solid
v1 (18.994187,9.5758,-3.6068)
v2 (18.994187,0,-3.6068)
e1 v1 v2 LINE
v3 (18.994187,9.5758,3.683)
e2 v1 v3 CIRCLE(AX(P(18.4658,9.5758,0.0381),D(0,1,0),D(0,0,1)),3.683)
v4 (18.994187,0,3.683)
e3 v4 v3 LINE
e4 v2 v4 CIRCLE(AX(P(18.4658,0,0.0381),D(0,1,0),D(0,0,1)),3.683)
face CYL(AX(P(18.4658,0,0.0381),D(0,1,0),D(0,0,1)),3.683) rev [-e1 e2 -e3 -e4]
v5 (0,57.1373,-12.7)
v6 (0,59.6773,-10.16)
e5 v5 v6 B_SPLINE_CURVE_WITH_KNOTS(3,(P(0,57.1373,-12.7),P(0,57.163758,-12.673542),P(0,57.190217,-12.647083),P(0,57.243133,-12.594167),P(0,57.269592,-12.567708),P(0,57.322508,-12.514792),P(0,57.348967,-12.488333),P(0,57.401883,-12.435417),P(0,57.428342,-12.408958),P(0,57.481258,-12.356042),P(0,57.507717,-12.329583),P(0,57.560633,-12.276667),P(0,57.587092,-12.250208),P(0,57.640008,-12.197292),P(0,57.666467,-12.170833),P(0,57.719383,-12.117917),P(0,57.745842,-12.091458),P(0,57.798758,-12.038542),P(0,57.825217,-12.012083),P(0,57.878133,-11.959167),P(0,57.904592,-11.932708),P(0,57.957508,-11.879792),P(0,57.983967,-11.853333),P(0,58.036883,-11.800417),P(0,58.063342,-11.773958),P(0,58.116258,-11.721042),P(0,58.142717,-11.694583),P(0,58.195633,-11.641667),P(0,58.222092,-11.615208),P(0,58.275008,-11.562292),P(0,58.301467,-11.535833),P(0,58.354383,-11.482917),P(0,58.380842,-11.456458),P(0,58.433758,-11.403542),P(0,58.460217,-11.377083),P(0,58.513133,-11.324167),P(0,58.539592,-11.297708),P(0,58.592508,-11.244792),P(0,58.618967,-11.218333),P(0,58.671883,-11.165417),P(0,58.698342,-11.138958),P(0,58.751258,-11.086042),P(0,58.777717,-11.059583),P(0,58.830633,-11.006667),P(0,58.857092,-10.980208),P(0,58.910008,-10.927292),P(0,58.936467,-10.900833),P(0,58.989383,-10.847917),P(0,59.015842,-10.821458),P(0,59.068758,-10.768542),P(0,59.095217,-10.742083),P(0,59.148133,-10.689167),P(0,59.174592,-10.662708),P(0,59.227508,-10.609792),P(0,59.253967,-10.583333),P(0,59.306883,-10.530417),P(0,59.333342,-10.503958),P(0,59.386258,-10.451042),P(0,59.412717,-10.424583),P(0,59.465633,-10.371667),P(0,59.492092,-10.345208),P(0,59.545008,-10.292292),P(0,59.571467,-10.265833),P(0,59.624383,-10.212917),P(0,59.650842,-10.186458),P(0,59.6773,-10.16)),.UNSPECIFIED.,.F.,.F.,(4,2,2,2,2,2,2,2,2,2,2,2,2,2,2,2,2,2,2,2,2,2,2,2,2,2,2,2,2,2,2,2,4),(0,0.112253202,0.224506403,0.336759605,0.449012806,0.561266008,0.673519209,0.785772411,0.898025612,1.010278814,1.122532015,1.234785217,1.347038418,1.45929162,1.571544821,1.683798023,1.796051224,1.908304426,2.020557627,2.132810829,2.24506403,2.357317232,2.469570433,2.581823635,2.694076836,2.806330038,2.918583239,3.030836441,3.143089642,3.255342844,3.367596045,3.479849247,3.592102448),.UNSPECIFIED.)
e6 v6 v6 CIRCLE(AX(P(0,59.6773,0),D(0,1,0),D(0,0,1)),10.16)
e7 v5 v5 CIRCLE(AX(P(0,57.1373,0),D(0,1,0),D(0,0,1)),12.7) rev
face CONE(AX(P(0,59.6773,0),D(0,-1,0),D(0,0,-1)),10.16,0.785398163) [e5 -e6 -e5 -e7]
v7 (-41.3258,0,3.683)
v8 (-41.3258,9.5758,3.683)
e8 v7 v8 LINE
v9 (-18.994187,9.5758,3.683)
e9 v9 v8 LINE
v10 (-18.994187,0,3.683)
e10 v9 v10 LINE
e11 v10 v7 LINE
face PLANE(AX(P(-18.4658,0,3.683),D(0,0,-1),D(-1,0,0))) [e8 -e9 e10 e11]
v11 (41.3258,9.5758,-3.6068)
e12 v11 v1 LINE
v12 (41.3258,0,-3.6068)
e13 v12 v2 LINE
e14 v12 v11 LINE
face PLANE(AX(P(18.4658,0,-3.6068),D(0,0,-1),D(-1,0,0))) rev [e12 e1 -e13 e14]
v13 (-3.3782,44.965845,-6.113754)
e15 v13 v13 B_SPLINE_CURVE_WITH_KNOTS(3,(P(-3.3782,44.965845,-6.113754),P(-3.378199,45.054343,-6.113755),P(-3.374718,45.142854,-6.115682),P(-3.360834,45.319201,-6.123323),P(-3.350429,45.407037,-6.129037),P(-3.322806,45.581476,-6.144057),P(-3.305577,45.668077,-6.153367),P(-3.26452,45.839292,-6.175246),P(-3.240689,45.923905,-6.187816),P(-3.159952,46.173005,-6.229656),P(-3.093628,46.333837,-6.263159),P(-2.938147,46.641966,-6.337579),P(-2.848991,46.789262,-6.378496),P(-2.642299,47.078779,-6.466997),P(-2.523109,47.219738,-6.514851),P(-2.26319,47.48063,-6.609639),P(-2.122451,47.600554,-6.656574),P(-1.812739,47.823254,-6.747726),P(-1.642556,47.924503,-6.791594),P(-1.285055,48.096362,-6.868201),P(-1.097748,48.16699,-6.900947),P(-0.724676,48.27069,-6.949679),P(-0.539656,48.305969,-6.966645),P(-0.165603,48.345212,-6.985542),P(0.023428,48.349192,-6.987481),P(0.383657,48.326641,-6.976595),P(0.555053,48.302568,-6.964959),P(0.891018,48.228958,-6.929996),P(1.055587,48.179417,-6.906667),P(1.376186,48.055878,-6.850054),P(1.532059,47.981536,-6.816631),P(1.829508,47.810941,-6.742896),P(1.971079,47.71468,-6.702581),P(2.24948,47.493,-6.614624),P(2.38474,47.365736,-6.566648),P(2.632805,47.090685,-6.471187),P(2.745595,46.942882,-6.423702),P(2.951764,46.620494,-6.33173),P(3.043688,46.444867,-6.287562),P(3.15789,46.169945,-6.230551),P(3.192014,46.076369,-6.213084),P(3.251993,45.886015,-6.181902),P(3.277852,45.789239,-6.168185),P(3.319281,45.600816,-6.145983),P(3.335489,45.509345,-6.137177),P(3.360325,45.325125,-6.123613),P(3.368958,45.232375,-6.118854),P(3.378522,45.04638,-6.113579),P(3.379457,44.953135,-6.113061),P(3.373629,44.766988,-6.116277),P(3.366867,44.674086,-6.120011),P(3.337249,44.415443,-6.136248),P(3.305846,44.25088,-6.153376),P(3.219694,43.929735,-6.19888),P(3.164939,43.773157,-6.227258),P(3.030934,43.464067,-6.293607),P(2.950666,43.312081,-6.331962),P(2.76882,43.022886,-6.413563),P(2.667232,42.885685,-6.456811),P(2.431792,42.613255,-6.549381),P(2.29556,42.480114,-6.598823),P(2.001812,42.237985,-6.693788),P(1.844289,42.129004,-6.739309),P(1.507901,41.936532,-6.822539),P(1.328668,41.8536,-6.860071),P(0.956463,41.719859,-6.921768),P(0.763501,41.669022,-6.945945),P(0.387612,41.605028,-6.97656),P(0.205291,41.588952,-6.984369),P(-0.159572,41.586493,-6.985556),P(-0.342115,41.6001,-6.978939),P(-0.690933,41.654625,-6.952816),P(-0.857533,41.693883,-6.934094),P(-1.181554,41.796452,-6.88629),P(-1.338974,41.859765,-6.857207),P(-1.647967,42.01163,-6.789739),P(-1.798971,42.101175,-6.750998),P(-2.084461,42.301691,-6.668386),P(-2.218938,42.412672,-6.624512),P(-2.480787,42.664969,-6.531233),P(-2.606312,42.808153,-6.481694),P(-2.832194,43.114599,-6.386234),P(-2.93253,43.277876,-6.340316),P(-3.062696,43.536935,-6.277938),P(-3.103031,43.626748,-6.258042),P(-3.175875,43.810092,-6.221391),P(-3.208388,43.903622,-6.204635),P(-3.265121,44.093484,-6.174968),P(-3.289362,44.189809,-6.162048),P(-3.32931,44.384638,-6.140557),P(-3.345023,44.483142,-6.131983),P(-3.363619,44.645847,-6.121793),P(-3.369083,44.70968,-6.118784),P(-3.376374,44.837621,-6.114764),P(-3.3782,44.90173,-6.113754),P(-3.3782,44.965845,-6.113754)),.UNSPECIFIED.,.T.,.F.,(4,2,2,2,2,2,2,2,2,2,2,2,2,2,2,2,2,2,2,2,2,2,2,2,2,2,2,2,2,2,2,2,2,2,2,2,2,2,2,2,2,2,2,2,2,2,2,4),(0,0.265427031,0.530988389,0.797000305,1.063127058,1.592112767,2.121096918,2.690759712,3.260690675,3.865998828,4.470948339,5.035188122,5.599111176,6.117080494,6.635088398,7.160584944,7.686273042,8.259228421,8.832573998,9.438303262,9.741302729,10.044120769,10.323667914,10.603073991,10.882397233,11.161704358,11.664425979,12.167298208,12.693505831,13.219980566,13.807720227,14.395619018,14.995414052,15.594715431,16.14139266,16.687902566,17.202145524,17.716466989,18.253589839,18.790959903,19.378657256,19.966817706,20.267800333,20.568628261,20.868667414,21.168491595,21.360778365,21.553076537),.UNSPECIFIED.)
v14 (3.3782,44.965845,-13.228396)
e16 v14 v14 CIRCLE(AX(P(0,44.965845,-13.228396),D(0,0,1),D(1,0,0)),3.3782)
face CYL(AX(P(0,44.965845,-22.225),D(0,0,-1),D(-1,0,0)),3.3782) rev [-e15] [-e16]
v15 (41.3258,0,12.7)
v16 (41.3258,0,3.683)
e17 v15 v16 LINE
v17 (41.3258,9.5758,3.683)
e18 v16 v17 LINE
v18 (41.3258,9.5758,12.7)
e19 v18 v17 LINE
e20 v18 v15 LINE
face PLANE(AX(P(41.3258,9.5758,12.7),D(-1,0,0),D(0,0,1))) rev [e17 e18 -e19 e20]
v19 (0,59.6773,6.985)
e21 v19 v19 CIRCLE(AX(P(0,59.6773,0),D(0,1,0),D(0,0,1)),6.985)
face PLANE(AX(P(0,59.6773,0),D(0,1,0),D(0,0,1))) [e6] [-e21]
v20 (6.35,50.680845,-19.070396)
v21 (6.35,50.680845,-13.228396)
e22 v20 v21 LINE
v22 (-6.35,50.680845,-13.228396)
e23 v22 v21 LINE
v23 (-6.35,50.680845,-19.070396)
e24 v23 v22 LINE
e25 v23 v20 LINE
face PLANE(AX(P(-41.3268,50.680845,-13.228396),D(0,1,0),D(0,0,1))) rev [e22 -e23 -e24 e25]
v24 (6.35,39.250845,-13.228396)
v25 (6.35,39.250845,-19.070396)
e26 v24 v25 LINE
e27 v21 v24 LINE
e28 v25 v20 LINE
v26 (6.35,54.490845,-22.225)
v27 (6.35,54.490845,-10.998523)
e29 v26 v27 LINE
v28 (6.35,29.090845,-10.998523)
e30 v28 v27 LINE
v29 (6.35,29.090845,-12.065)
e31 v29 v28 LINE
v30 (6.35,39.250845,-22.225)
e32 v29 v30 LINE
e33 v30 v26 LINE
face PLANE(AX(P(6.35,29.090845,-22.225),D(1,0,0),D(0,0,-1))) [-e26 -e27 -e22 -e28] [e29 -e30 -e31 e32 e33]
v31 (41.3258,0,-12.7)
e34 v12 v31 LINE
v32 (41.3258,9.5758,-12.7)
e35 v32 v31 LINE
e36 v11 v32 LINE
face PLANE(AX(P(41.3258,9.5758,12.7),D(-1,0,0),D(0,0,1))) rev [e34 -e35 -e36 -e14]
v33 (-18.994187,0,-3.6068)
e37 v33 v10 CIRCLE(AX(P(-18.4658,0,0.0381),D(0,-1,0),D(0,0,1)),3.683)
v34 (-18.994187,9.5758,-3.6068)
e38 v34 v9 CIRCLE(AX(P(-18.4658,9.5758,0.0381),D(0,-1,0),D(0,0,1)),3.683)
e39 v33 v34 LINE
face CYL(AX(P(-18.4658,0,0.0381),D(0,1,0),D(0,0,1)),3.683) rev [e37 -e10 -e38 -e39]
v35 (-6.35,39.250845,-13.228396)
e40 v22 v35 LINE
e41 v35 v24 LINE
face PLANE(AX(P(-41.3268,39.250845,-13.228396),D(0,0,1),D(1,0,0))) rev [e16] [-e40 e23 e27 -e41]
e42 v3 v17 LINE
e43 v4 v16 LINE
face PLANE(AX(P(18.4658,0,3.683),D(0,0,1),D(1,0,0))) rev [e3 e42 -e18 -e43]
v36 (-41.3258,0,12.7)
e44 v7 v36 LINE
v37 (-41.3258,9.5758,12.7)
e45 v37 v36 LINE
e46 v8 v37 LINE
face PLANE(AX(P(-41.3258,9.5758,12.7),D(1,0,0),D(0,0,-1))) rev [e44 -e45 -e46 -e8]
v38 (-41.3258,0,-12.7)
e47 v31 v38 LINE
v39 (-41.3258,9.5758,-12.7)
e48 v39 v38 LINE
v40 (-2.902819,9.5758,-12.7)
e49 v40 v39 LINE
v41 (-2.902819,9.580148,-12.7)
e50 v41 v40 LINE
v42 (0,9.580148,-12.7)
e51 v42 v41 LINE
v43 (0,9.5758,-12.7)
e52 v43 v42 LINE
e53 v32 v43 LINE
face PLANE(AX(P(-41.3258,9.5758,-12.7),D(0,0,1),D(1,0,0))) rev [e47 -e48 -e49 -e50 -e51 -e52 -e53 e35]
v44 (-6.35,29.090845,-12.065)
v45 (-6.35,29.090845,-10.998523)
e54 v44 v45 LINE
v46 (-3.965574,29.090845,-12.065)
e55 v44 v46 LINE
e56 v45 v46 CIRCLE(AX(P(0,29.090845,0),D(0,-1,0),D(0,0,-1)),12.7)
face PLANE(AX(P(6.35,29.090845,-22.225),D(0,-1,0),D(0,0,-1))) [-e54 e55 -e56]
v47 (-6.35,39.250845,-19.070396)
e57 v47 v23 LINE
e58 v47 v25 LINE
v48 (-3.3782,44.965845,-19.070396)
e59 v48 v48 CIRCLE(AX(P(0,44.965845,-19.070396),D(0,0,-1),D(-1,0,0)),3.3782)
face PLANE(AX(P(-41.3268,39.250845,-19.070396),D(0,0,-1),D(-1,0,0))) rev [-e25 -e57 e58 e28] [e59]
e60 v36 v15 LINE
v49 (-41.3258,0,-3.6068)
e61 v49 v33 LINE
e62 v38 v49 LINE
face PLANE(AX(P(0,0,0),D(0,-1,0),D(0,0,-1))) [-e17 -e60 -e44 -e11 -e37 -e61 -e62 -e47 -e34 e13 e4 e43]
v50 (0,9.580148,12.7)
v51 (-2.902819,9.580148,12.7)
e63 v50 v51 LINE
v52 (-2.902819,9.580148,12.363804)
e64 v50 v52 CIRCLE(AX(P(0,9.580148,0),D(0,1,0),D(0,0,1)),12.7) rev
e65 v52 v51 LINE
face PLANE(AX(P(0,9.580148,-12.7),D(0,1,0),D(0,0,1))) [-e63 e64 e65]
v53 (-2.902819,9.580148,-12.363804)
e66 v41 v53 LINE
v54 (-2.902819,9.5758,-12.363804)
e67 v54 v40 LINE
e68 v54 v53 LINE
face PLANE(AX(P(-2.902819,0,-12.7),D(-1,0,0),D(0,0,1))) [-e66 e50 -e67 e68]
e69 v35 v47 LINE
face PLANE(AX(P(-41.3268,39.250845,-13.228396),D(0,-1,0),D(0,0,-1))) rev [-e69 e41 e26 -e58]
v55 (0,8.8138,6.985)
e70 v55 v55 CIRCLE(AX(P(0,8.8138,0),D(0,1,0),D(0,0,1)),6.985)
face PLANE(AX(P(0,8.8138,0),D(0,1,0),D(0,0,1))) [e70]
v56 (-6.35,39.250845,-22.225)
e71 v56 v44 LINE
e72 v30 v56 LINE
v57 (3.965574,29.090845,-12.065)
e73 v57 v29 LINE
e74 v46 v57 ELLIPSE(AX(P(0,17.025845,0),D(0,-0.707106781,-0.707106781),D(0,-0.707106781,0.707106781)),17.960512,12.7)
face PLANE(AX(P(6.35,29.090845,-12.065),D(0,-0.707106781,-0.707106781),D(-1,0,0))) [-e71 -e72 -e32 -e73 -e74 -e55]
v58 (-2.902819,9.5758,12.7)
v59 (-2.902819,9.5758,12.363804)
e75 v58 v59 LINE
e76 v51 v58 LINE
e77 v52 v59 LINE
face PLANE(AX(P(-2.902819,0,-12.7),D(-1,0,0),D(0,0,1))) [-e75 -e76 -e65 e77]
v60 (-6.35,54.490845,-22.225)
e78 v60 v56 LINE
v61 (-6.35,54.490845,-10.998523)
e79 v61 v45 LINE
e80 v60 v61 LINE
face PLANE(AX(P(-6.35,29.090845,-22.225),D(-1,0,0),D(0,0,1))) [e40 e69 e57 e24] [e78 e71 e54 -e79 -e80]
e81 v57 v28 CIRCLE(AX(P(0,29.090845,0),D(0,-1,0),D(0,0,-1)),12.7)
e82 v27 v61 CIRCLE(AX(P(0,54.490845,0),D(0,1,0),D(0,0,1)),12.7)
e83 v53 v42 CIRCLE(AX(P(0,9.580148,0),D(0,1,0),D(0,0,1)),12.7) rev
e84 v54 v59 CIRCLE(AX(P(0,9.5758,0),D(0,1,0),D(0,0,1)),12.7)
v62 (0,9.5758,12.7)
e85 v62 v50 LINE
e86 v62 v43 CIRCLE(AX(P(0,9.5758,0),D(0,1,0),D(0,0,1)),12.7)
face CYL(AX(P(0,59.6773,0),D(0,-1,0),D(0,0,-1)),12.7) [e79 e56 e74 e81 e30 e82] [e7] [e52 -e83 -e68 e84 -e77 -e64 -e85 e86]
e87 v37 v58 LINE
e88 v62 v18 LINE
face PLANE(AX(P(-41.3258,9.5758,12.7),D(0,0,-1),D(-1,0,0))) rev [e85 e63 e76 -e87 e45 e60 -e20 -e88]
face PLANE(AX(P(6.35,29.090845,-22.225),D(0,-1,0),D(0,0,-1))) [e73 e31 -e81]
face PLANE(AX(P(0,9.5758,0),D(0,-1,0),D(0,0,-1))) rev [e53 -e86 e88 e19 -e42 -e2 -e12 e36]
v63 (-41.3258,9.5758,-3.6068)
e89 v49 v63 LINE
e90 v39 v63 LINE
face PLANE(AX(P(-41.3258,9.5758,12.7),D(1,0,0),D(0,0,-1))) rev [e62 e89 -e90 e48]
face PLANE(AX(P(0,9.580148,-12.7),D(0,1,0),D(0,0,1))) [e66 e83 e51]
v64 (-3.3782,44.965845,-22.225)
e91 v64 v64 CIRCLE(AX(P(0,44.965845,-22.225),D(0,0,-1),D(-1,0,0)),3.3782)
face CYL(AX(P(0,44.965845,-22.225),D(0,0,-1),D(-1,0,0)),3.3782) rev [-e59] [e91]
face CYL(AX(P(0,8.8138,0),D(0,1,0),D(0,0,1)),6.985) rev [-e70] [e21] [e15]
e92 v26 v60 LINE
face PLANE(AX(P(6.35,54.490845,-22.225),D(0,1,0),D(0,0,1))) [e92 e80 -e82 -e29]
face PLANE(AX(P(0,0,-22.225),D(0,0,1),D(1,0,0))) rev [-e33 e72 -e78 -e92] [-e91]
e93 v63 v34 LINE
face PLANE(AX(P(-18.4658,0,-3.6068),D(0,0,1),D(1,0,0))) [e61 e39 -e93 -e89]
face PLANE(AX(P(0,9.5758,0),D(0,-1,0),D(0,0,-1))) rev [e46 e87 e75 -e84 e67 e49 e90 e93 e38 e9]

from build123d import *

# Parameters (mm, degrees)
SKETCH1_W                   = 82.6516
SKETCH1_H                   = 25.4
BOSS_EXTRUDE1_DEPTH         = 9.5758
SKETCH8_W                   = 2.902818519
SKETCH8_H                   = 9.580147983
BOSS_EXTRUDE4_DEPTH         = 25.4
SKETCH10_R                  = 12.7
BOSS_EXTRUDE5_DEPTH         = 50.1015
SKETCH12_R                  = 6.985
CUT_EXTRUDE2_DEPTH          = 50.8635
CHAMFER1_SIZE               = 2.54
SKETCH14_W                  = 12.7
SKETCH14_H                  = 25.4
BOSS_EXTRUDE6_DEPTH         = 15.24
CUT_EXTRUDE3_REACH          = 81.551
SKETCH18_W                  = 5.842
SKETCH18_H                  = 11.43
F_1_4_CLEARANCE_HOLE2_D     = 6.7564
F_1_4_CLEARANCE_HOLE2_DEPTH = 20.32
F_1_4_CLEARANCE_HOLE2_TIP   = 2.029827343
CHAMFER2_SIZE               = 10.16
SKETCH2_W                   = 22.86
SKETCH2_H                   = 7.2898
CUT_EXTRUDE1_DEPTH          = 69.64351887
SKETCH23_R                  = 3.683
CUT_EXTRUDE6_DEPTH          = 69.64351887


with BuildPart() as part:
    # Sketch1 → Boss-Extrude1 (new body)
    with BuildSketch(Plane(origin=(0, 0, 0), x_dir=(1, 0, 0), z_dir=(0, 1, 0))):
        Rectangle(SKETCH1_W, SKETCH1_H)
    extrude(amount=BOSS_EXTRUDE1_DEPTH)

    # Sketch8 → Boss-Extrude4 (add, through all)
    with BuildSketch(Plane.XY.offset(12.7)):
        with Locations((-1.45140926, 4.790073991)):
            Rectangle(SKETCH8_W, SKETCH8_H)
    extrude(amount=-BOSS_EXTRUDE4_DEPTH)

    # Sketch10 → Boss-Extrude5 (add)
    with BuildSketch(Plane(origin=(0, 9.5758, 0), x_dir=(1, 0, 0), z_dir=(0, 1, 0))):
        with Locations(Location((0, 0, 0), (0, 0, 270))):
            Circle(SKETCH10_R)
    extrude(amount=BOSS_EXTRUDE5_DEPTH)

    # Sketch12 → Cut-Extrude2 (cut)
    with BuildSketch(Plane(origin=(0, 59.6773, 0), x_dir=(1, 0, 0), z_dir=(0, 1, 0))):
        with Locations(Location((0, 0, 0), (0, 0, 270))):
            Circle(SKETCH12_R)
    extrude(amount=-CUT_EXTRUDE2_DEPTH, mode=Mode.SUBTRACT)

    # Chamfer1
    chamfer1_edges = [part.edges().sort_by_distance(p)[0] for p in [
        (0, 59.6773, -12.7),
    ]]
    chamfer(chamfer1_edges, length=CHAMFER1_SIZE)

    # Sketch14 → Boss-Extrude6 (add)
    with BuildSketch(Plane.XY.offset(-6.985)):
        with Locations((0, 41.790845474)):
            Rectangle(SKETCH14_W, SKETCH14_H)
    extrude(amount=-BOSS_EXTRUDE6_DEPTH)

    # Sketch18 → Cut-Extrude3 (cut, up to next)
    with BuildSketch(Plane(origin=(6.35, 0, 0), x_dir=(0, 0, -1), z_dir=(1, 0, 0)), mode=Mode.PRIVATE) as cut_extrude3_sk1:
        with Locations((16.149395763, 44.965845474)):
            Rectangle(SKETCH18_W, SKETCH18_H)
    cut_extrude3_tool1 = extrude(cut_extrude3_sk1.sketch, amount=-CUT_EXTRUDE3_REACH, mode=Mode.PRIVATE) & part.part
    add(cut_extrude3_tool1.solids().sort_by_distance((6.35, 44.965845, -16.149396))[0], mode=Mode.SUBTRACT)

    # 1/4 Clearance Hole2
    with Locations(Plane(origin=(0, 0, -22.225), x_dir=(-1, 0, 0), z_dir=(0, 0, -1))):
        with Locations((0, 44.965845474)):
            Hole(F_1_4_CLEARANCE_HOLE2_D / 2, depth=F_1_4_CLEARANCE_HOLE2_DEPTH)
            with Locations((0, 0, -(F_1_4_CLEARANCE_HOLE2_DEPTH + F_1_4_CLEARANCE_HOLE2_TIP / 2))):  # 118° drill point
                Cone(0, F_1_4_CLEARANCE_HOLE2_D / 2, F_1_4_CLEARANCE_HOLE2_TIP, mode=Mode.SUBTRACT)

    # Chamfer2
    # the kernel refuses this chamfer: 10.16 mm, written as the material it takes off along each edge
    with BuildSketch(Plane(origin=(32.478299158, 29.090845474, -22.225), x_dir=(0, -0.027495876610586265, 0.9996219169112968), z_dir=(-1, 0, 0))) as chamfer2_piece_1_section:
        Polygon((CHAMFER2_SIZE * 0.999621916911, CHAMFER2_SIZE * 0.0274958766106), (-CHAMFER2_SIZE * 0.0274958766106, CHAMFER2_SIZE * 0.999621916911), (0, 0), align=None)
    chamfer2_piece_1 = extrude(amount=64.956598315, mode=Mode.PRIVATE)
    chamfer2_piece_1 = chamfer2_piece_1 - Plane(origin=(0, 32.444576681, 0), x_dir=(0, 0, 1), z_dir=(0, -1, 0)) * Cylinder(12.7, 171, mode=Mode.PRIVATE)
    add(chamfer2_piece_1, mode=Mode.SUBTRACT)

    # Sketch2 → Cut-Extrude1 (cut, through all)
    with BuildSketch(Plane(origin=(0, 9.5758, 0), x_dir=(1, 0, 0), z_dir=(0, 1, 0))):
        with Locations((29.8958, -0.0381)):
            Rectangle(SKETCH2_W, SKETCH2_H)
    cut_extrude1 = extrude(amount=-CUT_EXTRUDE1_DEPTH, mode=Mode.SUBTRACT)

    # Sketch23 → Cut-Extrude6 (cut, through all)
    with BuildSketch(Plane(origin=(0, 9.5758, 0), x_dir=(1, 0, 0), z_dir=(0, 1, 0))):
        with Locations((18.4658, -0.0381)):
            Circle(SKETCH23_R)
    cut_extrude6 = extrude(amount=-CUT_EXTRUDE6_DEPTH, mode=Mode.SUBTRACT)

    # Mirror1: Cut-Extrude1, Cut-Extrude6 across plane
    add(cut_extrude1.mirror(Plane(origin=(0, 0, 0), x_dir=(0, 0, 1), z_dir=(1, 0, 0))), mode=Mode.SUBTRACT)
    add(cut_extrude6.mirror(Plane(origin=(0, 0, 0), x_dir=(0, 0, 1), z_dir=(1, 0, 0))), mode=Mode.SUBTRACT)


solid = part.part
